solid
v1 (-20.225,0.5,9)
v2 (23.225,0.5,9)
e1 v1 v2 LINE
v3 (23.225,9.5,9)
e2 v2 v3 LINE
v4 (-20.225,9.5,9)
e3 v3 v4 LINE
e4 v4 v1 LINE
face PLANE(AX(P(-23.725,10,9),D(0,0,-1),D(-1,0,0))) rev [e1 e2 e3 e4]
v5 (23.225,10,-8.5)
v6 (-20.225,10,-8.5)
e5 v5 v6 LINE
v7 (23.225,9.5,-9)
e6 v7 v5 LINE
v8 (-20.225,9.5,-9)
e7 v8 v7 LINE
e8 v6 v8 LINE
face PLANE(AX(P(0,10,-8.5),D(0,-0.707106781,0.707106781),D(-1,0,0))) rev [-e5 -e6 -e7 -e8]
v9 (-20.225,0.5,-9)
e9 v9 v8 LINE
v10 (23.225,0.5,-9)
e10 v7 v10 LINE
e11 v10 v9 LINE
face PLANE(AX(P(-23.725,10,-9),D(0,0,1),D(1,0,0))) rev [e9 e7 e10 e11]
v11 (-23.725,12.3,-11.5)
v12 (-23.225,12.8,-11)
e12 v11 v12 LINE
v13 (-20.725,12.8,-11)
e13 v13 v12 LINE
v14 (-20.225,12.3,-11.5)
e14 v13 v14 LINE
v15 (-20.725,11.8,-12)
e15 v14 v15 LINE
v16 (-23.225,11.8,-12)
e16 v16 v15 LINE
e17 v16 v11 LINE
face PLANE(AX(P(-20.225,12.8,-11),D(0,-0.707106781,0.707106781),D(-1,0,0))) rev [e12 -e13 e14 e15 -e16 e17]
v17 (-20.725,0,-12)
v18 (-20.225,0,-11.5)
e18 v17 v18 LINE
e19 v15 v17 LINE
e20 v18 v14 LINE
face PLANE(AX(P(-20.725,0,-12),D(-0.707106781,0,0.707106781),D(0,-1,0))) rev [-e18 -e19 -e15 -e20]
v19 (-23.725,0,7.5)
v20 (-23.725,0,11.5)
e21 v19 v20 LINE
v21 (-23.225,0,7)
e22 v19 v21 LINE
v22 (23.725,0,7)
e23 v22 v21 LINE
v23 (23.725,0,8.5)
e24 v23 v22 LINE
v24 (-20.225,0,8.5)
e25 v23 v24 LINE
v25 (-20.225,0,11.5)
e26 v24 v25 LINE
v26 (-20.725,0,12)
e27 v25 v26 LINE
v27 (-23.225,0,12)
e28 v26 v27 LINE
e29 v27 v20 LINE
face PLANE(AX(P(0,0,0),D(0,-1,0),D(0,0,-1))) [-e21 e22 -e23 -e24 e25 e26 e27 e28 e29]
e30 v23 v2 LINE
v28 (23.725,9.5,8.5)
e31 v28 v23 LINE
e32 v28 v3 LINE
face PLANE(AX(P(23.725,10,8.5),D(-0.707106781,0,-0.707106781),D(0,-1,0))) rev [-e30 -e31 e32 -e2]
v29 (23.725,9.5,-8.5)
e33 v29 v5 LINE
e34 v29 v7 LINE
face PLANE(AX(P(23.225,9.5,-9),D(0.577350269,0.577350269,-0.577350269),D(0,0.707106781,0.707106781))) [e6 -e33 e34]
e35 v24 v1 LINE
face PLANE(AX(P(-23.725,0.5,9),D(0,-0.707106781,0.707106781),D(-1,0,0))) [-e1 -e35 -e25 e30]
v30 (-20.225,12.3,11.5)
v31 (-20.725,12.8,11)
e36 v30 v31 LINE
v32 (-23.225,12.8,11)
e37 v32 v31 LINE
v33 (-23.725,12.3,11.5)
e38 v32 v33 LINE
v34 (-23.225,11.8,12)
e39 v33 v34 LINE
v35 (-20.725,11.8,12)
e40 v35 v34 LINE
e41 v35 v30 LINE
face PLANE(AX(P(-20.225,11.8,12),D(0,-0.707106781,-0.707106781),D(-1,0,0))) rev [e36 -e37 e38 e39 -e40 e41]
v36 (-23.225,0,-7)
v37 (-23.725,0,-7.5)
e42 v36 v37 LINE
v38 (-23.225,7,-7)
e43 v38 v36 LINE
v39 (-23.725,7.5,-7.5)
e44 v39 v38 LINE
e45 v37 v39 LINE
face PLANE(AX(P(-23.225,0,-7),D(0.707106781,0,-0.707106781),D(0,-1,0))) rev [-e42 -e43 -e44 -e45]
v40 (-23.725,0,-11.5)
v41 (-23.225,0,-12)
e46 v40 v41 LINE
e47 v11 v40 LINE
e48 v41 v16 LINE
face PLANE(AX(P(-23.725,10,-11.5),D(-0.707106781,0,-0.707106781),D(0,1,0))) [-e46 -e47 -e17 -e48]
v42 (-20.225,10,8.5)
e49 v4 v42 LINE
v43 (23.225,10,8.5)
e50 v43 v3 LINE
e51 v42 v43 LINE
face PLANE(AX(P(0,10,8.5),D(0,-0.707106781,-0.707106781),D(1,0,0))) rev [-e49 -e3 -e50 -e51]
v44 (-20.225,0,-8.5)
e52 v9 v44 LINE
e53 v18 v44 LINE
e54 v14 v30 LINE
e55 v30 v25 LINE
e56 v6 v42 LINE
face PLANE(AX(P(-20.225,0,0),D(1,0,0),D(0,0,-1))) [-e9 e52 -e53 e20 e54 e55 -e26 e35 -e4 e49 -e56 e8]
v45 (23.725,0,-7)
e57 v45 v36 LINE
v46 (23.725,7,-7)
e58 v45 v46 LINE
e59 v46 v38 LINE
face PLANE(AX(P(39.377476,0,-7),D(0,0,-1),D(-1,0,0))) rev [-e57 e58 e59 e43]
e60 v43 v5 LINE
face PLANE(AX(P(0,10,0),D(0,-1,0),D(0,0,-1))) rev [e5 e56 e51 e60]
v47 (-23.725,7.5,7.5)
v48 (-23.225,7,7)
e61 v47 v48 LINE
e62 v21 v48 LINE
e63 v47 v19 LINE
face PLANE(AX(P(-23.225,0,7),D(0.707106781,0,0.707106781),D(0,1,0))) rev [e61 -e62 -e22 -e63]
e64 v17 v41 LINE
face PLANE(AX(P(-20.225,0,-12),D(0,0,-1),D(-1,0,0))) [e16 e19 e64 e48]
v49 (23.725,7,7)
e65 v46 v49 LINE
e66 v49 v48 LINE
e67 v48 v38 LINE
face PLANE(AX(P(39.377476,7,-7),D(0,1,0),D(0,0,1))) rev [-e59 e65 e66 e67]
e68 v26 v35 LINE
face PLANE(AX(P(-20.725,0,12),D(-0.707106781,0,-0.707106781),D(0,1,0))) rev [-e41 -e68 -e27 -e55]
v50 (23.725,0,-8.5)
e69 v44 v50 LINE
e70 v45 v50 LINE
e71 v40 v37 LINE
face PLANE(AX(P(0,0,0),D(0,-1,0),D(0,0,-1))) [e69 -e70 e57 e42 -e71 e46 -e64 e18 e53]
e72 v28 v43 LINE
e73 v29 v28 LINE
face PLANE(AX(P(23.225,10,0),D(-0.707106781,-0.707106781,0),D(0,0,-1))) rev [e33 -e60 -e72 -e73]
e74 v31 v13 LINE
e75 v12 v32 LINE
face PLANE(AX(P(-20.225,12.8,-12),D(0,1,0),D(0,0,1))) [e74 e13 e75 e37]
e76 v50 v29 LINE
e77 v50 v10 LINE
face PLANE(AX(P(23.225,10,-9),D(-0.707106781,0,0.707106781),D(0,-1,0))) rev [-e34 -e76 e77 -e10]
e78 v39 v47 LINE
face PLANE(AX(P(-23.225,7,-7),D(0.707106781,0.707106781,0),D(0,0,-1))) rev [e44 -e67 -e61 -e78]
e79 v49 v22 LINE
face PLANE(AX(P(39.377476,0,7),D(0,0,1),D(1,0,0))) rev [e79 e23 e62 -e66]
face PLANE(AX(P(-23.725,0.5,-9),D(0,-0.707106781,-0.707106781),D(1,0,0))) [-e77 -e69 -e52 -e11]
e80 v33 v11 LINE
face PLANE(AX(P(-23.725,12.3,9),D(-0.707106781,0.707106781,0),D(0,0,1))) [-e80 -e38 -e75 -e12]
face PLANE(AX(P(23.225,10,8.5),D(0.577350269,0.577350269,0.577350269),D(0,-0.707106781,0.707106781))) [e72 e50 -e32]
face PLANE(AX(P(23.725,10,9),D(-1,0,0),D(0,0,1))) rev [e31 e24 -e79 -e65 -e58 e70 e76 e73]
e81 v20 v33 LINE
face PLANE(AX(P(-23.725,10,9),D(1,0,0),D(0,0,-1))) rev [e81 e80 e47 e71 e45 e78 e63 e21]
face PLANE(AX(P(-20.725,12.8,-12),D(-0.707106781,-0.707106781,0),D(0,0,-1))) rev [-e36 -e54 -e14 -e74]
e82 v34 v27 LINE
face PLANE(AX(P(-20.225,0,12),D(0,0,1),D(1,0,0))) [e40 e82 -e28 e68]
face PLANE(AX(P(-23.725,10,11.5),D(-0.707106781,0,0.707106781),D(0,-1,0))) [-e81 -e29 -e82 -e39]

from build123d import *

# Parameters (mm, degrees)
SKETCH_1_W          = 47.45
SKETCH_1_H          = 18
EXTRUDE_1_DEPTH     = 10
SKETCH_2_W          = 24
SKETCH_2_H          = 12.8
EXTRUDE_2_DEPTH     = 3.5
SKETCH_3_W          = 14
SKETCH_3_H          = 7
CUT_EXTRUDE_1_DEPTH = 47.45
CHAMFER_1_SIZE      = 1
CHAMFER_2_SIZE      = 0.5


with BuildPart() as part:
    # 草图1 → 凸台-拉伸1 (new body)
    with BuildSketch(Plane(origin=(0, 0, 0), x_dir=(1, 0, 0), z_dir=(0, 1, 0))):
        Rectangle(SKETCH_1_W, SKETCH_1_H)
    extrude(amount=EXTRUDE_1_DEPTH)

    # 草图2 → 凸台-拉伸2 (add)
    with BuildSketch(Plane.ZY.offset(23.725)):
        with Locations((0, 6.4)):
            Rectangle(SKETCH_2_W, SKETCH_2_H)
    extrude(amount=-EXTRUDE_2_DEPTH)

    # 草图3 → 切除-拉伸1 (cut)
    with BuildSketch(Plane.ZY.offset(23.725)):
        with Locations((0, 3.5)):
            Rectangle(SKETCH_3_W, SKETCH_3_H)
    extrude(amount=-CUT_EXTRUDE_1_DEPTH, mode=Mode.SUBTRACT)

    # 倒角1
    chamfer_1_edges = [part.edges().sort_by_distance(p)[0] for p in [
        (-21.975, 12.8, -12),
        (-21.975, 12.8, 12),
    ]]
    chamfer(chamfer_1_edges, length=CHAMFER_1_SIZE)

    # 倒角2
    chamfer_2_edges = [part.edges().sort_by_distance(p)[0] for p in [
        (1.75, 0, 9),
        (1.75, 0, -9),
        (1.75, 10, -9),
        (1.75, 10, 9),
        (23.725, 5, -9),
        (23.725, 10, 0),
        (23.725, 5, 9),
        (-20.225, 5.9, -12),
        (-20.225, 12.8, 0),
        (-20.225, 5.9, 12),
        (-23.725, 12.8, 0),
        (-23.725, 5.9, -12),
        (-23.725, 5.9, 12),
        (-23.725, 3.5, 7),
        (-23.725, 7, 0),
        (-23.725, 3.5, -7),
    ]]
    chamfer(chamfer_2_edges, length=CHAMFER_2_SIZE - 0.0001)  # a hair under: the kernel refuses the full size


solid = part.part
